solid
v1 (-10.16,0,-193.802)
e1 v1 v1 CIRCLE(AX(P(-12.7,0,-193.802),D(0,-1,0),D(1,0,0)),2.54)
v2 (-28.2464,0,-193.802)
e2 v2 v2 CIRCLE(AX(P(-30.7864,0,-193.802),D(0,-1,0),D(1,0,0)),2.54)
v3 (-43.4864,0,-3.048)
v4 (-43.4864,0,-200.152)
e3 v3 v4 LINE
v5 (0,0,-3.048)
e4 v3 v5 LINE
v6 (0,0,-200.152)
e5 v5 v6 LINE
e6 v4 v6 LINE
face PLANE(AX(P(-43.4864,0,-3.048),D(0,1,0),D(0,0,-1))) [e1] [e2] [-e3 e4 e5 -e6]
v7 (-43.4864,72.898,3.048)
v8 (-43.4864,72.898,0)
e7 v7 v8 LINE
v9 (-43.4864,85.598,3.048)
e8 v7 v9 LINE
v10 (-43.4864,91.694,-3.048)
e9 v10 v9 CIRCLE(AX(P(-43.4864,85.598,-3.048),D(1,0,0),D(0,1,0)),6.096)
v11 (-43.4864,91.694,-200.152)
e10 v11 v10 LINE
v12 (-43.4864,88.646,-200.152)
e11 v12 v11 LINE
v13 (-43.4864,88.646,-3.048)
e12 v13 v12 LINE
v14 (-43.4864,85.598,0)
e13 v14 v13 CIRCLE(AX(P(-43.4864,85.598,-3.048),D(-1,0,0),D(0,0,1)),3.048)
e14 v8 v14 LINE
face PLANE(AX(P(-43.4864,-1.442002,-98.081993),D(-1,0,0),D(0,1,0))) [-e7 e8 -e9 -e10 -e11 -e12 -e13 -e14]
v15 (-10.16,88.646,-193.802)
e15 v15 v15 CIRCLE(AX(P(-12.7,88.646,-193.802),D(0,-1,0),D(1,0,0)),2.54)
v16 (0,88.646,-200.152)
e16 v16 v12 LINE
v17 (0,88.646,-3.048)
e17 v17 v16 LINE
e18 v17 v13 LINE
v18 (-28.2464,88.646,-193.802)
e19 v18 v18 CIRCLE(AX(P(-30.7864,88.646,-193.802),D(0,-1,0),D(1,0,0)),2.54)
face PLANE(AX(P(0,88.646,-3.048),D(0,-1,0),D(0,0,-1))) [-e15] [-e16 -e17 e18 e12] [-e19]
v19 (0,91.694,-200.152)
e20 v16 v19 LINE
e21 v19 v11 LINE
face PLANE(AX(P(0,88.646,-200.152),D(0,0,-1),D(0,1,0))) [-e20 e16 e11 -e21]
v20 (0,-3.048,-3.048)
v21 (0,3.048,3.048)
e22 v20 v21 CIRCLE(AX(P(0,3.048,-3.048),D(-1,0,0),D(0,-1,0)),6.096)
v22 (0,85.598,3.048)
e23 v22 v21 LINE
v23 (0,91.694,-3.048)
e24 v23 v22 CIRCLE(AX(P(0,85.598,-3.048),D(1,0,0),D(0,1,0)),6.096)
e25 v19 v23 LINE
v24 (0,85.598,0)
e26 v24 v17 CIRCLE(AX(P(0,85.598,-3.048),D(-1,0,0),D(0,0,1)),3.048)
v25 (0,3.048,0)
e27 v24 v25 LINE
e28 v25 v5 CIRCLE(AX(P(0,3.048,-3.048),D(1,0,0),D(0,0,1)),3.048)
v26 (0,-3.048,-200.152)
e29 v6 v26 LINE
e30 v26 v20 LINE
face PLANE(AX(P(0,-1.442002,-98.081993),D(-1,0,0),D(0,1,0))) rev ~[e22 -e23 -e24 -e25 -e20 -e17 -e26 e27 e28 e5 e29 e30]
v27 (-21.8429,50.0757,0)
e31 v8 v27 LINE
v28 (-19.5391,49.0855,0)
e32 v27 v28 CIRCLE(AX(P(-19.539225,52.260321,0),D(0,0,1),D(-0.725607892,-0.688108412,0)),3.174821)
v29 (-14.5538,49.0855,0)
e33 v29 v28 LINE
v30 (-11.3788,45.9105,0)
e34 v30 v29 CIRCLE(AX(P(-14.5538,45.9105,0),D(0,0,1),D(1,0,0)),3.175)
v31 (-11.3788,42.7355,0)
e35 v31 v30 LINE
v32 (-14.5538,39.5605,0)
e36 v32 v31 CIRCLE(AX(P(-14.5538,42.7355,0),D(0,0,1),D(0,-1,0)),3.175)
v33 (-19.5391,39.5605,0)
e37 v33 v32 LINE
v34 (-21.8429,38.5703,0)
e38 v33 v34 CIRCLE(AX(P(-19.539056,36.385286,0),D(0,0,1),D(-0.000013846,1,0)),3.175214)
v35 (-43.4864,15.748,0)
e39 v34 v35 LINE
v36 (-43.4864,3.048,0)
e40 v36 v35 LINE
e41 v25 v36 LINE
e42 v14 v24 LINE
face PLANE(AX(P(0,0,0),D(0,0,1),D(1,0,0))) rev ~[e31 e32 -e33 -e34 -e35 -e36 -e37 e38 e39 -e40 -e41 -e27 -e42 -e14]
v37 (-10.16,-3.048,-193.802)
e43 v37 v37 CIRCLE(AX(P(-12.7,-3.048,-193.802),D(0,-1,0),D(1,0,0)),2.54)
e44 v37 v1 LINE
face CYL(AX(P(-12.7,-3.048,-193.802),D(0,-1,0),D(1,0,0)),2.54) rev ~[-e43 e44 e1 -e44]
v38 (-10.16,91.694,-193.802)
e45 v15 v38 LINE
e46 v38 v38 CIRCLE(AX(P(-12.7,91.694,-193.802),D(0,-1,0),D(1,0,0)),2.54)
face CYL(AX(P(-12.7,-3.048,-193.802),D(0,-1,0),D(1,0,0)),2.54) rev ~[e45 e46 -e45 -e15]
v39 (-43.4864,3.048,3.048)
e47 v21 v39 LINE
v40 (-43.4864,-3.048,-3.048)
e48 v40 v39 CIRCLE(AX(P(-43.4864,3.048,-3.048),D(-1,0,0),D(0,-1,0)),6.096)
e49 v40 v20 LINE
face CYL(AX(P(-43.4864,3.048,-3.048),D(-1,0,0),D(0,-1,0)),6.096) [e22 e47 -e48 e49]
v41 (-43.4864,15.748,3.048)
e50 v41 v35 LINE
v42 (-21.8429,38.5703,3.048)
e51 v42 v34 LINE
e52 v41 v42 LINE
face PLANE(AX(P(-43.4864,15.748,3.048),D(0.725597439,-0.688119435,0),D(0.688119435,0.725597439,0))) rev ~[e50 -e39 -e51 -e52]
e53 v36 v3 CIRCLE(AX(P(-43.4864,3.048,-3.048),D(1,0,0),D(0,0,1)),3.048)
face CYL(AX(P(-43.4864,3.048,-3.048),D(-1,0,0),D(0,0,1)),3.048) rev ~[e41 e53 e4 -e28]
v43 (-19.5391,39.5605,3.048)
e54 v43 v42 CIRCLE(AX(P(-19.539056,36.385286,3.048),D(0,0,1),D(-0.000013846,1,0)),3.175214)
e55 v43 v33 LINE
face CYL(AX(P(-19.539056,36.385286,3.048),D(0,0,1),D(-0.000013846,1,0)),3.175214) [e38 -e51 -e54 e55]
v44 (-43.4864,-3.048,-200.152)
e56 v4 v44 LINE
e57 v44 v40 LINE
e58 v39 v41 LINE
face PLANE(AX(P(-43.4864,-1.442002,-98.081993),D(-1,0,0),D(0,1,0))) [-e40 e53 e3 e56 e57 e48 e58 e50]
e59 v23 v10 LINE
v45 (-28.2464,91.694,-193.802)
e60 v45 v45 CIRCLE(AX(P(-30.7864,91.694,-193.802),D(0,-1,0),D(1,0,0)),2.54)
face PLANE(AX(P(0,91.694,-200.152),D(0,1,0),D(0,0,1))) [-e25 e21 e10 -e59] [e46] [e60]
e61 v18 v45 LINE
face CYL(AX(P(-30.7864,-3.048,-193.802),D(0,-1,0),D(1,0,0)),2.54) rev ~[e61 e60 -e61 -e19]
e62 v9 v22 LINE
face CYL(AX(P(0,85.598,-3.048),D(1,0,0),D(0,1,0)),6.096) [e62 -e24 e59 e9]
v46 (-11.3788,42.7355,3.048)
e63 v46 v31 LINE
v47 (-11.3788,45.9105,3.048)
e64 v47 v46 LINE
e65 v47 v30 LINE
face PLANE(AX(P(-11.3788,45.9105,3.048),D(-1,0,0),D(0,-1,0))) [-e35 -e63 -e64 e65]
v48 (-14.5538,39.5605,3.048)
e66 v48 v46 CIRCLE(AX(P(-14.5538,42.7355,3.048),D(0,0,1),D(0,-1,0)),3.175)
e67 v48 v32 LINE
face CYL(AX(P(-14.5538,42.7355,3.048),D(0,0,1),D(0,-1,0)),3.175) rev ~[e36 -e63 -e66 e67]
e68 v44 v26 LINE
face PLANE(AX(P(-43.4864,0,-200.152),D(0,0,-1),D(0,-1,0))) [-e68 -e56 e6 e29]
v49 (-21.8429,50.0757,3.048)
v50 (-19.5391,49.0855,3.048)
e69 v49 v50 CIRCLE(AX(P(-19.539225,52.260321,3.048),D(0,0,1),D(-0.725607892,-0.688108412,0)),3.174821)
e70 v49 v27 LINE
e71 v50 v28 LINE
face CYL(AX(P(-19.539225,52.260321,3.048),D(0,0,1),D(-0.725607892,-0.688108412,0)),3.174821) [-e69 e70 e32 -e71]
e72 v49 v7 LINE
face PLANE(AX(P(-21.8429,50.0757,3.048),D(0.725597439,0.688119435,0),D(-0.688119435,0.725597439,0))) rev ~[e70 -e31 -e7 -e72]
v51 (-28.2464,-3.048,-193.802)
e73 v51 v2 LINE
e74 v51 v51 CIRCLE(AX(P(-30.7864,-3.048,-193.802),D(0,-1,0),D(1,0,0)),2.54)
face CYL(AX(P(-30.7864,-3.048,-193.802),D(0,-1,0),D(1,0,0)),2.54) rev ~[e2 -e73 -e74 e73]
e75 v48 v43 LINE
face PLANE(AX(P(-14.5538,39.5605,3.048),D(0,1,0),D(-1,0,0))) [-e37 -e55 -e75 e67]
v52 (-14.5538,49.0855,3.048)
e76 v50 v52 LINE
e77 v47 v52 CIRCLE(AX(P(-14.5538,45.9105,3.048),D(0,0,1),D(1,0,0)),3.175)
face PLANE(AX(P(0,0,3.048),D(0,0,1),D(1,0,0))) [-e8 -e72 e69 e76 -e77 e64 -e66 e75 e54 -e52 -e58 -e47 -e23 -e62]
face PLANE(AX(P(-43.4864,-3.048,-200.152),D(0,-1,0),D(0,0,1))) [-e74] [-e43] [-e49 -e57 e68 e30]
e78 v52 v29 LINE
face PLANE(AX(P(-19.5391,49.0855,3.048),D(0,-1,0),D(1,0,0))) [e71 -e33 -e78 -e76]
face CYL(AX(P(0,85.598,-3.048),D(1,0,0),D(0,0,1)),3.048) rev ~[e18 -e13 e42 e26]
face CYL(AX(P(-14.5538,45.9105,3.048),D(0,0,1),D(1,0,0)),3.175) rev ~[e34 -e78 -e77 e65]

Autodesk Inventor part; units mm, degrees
ref_plane "YZ Plane" through (0, 0, 0) normal (1, 0, 0) x (0, 1, 0)
ref_plane "XZ Plane" through (0, 0, 0) normal (0, 1, 0) x (-1, 0, 0)
ref_plane "XY Plane" through (0, 0, 0) normal (0, 0, 1) x (1, 0, 0)
sketch "Sketch1" plane through (0, 0, 0) normal (0, 0, 1) x (1, 0, 0)
  line L0 (0, 3.048) -> (-43.4864, 3.048) construction
  line L1 (-43.4864, 0) -> (-43.4864, 3.048)
  line L2 (-43.4864, 0) -> (0, 0)
  line L3 (0, 0) -> (0, 3.048)
  line L4 (0, 88.646) -> (-43.4864, 88.646)
  line L5 (-43.4864, 85.598) -> (-43.4864, 88.646)
  line L6 (-43.4864, 85.598) -> (0, 85.598) construction
  line L7 (0, 85.598) -> (0, 88.646)
  line L8 (0, 0) -> (-43.4864, 0)
  line L9 (-43.4864, 0) -> (-43.4864, 88.646)
  line L10 (-43.4864, 88.646) -> (0, 88.646)
  line L11 (0, 88.646) -> (0, 0)
extrude "Plate1" add sketch "Sketch1" along normal blind 3.048
sketch "Sketch2" plane through (-43.4864, 0, 0) normal (0, -1, 0) x (1, 0, 0)
  line L0 (43.4864, 0) -> (0, 0)
  line L1 (0, 0) -> (0, -200.152)
  line L2 (0, -200.152) -> (43.4864, -200.152)
  line L3 (43.4864, -200.152) -> (43.4864, 0)
edge flange "Flange1" height 203.2 angle 90 thickness 3.048 bend radius 3.048 thickness toward (0, -1, 0) relief tear relief width 3.048 relief depth 1.524 corner gap 3.048 corner form 0 edges at (-21.7432, 0, 0) (-21.7432, 88.646, 0) wall of the first edge with corners at (0, 0, 0) (-43.4864, 0, 0) (-43.4864, 0, -200.152) (0, 0, -200.152)
bend "Bend1"
corner "Corner1"
sketch "Sketch3" plane through (0, 0, 3.048) normal (0, 0, 1) x (1, 0, 0)
  line L0 (-43.4864, 3.048) -> (-43.4864, 15.748) construction
  line L1 (-43.4864, 15.748) -> (-21.8429, 38.5703)
  line L2 (-16.3873, 44.323) -> (-20.9038, 49.0855) construction
  line L3 (-43.4864, 85.598) -> (-43.4864, 72.898) construction
  line L4 (-43.4864, 3.048) -> (-43.4864, 85.598) projected
  line L5 (-43.4864, 72.898) -> (-43.4864, 15.748)
  line L6 (-19.5391, 49.0855) -> (-14.5538, 49.0855)
  line L7 (-11.3788, 45.9105) -> (-11.3788, 42.7355)
  line L8 (-14.5538, 39.5605) -> (-19.5391, 39.5605)
  line L9 (-20.9038, 39.5605) -> (-16.3873, 44.323) construction
  line L10 (-21.8429, 50.0757) -> (-43.4864, 72.898)
  arc A0 (-14.5538, 39.5605) -> (-11.3788, 42.7355) centre (-14.5538, 42.7355) ccw
  arc A1 (-11.3788, 45.9105) -> (-14.5538, 49.0855) centre (-14.5538, 45.9105) ccw
  arc A2 (-21.8429, 50.0757) -> (-19.5391, 49.0855) centre (-19.5391, 52.2605) ccw
  arc A3 (-19.5391, 39.5605) -> (-21.8429, 38.5703) centre (-19.5391, 36.3855) ccw
  line L11 (-43.4864, 3.048) -> (-43.4864, 85.598) projected
  point P0 (0, 0)
  point P1 (-11.3788, 49.0855)
  point P2 (-11.3788, 39.5605)
  dimension "d11" = 12.7
  dimension "d12" = 28.575
  dimension "d14" = 12.7
  dimension "d18" = 9.525
  dimension "d19" = 9.525
  dimension "d20" = 9.525
  dimension "d24" = 3.175
  dimension "d25" = 11.5054
extrude "Extrusion1" cut sketch "Sketch3" against normal up to next
sketch "Sketch4" plane through (-43.4864, -3.048, -200.152) normal (0, -1, 0) x (1, 0, 0)
  circle A0 centre (12.7, 6.35) radius 2.54
  circle A1 centre (30.7864, 6.35) radius 2.54
  line L0 (0, 0) -> (0, 197.104) projected
  line L1 (43.4864, 0) -> (0, 0) projected
  line L2 (43.4864, 0) -> (43.4864, 197.104) projected
  point P0 (43.4864, 200.152)
  dimension "d26" = 5.08
  dimension "d27" = 5.08
  dimension "d28" = 12.7
  dimension "d29" = 6.35
  dimension "d30" = 6.35
  dimension "d31" = 12.7
extrude "Extrusion2" cut sketch "Sketch4" against normal up to surface (94.742 mm away)
equation "\"d1\" = BendReliefWidth"
equation "\"d2\" = BendReliefDepth"
equation "\"d3\" = MinimumRemnant"
equation "\"d4\" = BendRadius"
equation "\"d7\" = BendRadius"
equation "\"d8\" = CornerReliefSize"
equation "\"d9\" = GapSize"
equation "\"d10\" = JacobiRadiusSize"
equation "\"BendRadius\" = Thickness"
equation "\"BendReliefWidth\" = Thickness"
equation "\"BendReliefDepth\" = 0.5 * Thickness"
equation "\"CornerReliefSize\" = 4 * Thickness"
equation "\"MinimumRemnant\" = 2 * Thickness"
equation "\"TransitionRadius\" = BendRadius"
equation "\"JacobiRadiusSize\" = BendRadius"
equation "\"GapSize\" = Thickness"
equation "\"d0\" = BendRadius"
equation "\"Thickness\" = 3.048"
properties part number "guidebar"
